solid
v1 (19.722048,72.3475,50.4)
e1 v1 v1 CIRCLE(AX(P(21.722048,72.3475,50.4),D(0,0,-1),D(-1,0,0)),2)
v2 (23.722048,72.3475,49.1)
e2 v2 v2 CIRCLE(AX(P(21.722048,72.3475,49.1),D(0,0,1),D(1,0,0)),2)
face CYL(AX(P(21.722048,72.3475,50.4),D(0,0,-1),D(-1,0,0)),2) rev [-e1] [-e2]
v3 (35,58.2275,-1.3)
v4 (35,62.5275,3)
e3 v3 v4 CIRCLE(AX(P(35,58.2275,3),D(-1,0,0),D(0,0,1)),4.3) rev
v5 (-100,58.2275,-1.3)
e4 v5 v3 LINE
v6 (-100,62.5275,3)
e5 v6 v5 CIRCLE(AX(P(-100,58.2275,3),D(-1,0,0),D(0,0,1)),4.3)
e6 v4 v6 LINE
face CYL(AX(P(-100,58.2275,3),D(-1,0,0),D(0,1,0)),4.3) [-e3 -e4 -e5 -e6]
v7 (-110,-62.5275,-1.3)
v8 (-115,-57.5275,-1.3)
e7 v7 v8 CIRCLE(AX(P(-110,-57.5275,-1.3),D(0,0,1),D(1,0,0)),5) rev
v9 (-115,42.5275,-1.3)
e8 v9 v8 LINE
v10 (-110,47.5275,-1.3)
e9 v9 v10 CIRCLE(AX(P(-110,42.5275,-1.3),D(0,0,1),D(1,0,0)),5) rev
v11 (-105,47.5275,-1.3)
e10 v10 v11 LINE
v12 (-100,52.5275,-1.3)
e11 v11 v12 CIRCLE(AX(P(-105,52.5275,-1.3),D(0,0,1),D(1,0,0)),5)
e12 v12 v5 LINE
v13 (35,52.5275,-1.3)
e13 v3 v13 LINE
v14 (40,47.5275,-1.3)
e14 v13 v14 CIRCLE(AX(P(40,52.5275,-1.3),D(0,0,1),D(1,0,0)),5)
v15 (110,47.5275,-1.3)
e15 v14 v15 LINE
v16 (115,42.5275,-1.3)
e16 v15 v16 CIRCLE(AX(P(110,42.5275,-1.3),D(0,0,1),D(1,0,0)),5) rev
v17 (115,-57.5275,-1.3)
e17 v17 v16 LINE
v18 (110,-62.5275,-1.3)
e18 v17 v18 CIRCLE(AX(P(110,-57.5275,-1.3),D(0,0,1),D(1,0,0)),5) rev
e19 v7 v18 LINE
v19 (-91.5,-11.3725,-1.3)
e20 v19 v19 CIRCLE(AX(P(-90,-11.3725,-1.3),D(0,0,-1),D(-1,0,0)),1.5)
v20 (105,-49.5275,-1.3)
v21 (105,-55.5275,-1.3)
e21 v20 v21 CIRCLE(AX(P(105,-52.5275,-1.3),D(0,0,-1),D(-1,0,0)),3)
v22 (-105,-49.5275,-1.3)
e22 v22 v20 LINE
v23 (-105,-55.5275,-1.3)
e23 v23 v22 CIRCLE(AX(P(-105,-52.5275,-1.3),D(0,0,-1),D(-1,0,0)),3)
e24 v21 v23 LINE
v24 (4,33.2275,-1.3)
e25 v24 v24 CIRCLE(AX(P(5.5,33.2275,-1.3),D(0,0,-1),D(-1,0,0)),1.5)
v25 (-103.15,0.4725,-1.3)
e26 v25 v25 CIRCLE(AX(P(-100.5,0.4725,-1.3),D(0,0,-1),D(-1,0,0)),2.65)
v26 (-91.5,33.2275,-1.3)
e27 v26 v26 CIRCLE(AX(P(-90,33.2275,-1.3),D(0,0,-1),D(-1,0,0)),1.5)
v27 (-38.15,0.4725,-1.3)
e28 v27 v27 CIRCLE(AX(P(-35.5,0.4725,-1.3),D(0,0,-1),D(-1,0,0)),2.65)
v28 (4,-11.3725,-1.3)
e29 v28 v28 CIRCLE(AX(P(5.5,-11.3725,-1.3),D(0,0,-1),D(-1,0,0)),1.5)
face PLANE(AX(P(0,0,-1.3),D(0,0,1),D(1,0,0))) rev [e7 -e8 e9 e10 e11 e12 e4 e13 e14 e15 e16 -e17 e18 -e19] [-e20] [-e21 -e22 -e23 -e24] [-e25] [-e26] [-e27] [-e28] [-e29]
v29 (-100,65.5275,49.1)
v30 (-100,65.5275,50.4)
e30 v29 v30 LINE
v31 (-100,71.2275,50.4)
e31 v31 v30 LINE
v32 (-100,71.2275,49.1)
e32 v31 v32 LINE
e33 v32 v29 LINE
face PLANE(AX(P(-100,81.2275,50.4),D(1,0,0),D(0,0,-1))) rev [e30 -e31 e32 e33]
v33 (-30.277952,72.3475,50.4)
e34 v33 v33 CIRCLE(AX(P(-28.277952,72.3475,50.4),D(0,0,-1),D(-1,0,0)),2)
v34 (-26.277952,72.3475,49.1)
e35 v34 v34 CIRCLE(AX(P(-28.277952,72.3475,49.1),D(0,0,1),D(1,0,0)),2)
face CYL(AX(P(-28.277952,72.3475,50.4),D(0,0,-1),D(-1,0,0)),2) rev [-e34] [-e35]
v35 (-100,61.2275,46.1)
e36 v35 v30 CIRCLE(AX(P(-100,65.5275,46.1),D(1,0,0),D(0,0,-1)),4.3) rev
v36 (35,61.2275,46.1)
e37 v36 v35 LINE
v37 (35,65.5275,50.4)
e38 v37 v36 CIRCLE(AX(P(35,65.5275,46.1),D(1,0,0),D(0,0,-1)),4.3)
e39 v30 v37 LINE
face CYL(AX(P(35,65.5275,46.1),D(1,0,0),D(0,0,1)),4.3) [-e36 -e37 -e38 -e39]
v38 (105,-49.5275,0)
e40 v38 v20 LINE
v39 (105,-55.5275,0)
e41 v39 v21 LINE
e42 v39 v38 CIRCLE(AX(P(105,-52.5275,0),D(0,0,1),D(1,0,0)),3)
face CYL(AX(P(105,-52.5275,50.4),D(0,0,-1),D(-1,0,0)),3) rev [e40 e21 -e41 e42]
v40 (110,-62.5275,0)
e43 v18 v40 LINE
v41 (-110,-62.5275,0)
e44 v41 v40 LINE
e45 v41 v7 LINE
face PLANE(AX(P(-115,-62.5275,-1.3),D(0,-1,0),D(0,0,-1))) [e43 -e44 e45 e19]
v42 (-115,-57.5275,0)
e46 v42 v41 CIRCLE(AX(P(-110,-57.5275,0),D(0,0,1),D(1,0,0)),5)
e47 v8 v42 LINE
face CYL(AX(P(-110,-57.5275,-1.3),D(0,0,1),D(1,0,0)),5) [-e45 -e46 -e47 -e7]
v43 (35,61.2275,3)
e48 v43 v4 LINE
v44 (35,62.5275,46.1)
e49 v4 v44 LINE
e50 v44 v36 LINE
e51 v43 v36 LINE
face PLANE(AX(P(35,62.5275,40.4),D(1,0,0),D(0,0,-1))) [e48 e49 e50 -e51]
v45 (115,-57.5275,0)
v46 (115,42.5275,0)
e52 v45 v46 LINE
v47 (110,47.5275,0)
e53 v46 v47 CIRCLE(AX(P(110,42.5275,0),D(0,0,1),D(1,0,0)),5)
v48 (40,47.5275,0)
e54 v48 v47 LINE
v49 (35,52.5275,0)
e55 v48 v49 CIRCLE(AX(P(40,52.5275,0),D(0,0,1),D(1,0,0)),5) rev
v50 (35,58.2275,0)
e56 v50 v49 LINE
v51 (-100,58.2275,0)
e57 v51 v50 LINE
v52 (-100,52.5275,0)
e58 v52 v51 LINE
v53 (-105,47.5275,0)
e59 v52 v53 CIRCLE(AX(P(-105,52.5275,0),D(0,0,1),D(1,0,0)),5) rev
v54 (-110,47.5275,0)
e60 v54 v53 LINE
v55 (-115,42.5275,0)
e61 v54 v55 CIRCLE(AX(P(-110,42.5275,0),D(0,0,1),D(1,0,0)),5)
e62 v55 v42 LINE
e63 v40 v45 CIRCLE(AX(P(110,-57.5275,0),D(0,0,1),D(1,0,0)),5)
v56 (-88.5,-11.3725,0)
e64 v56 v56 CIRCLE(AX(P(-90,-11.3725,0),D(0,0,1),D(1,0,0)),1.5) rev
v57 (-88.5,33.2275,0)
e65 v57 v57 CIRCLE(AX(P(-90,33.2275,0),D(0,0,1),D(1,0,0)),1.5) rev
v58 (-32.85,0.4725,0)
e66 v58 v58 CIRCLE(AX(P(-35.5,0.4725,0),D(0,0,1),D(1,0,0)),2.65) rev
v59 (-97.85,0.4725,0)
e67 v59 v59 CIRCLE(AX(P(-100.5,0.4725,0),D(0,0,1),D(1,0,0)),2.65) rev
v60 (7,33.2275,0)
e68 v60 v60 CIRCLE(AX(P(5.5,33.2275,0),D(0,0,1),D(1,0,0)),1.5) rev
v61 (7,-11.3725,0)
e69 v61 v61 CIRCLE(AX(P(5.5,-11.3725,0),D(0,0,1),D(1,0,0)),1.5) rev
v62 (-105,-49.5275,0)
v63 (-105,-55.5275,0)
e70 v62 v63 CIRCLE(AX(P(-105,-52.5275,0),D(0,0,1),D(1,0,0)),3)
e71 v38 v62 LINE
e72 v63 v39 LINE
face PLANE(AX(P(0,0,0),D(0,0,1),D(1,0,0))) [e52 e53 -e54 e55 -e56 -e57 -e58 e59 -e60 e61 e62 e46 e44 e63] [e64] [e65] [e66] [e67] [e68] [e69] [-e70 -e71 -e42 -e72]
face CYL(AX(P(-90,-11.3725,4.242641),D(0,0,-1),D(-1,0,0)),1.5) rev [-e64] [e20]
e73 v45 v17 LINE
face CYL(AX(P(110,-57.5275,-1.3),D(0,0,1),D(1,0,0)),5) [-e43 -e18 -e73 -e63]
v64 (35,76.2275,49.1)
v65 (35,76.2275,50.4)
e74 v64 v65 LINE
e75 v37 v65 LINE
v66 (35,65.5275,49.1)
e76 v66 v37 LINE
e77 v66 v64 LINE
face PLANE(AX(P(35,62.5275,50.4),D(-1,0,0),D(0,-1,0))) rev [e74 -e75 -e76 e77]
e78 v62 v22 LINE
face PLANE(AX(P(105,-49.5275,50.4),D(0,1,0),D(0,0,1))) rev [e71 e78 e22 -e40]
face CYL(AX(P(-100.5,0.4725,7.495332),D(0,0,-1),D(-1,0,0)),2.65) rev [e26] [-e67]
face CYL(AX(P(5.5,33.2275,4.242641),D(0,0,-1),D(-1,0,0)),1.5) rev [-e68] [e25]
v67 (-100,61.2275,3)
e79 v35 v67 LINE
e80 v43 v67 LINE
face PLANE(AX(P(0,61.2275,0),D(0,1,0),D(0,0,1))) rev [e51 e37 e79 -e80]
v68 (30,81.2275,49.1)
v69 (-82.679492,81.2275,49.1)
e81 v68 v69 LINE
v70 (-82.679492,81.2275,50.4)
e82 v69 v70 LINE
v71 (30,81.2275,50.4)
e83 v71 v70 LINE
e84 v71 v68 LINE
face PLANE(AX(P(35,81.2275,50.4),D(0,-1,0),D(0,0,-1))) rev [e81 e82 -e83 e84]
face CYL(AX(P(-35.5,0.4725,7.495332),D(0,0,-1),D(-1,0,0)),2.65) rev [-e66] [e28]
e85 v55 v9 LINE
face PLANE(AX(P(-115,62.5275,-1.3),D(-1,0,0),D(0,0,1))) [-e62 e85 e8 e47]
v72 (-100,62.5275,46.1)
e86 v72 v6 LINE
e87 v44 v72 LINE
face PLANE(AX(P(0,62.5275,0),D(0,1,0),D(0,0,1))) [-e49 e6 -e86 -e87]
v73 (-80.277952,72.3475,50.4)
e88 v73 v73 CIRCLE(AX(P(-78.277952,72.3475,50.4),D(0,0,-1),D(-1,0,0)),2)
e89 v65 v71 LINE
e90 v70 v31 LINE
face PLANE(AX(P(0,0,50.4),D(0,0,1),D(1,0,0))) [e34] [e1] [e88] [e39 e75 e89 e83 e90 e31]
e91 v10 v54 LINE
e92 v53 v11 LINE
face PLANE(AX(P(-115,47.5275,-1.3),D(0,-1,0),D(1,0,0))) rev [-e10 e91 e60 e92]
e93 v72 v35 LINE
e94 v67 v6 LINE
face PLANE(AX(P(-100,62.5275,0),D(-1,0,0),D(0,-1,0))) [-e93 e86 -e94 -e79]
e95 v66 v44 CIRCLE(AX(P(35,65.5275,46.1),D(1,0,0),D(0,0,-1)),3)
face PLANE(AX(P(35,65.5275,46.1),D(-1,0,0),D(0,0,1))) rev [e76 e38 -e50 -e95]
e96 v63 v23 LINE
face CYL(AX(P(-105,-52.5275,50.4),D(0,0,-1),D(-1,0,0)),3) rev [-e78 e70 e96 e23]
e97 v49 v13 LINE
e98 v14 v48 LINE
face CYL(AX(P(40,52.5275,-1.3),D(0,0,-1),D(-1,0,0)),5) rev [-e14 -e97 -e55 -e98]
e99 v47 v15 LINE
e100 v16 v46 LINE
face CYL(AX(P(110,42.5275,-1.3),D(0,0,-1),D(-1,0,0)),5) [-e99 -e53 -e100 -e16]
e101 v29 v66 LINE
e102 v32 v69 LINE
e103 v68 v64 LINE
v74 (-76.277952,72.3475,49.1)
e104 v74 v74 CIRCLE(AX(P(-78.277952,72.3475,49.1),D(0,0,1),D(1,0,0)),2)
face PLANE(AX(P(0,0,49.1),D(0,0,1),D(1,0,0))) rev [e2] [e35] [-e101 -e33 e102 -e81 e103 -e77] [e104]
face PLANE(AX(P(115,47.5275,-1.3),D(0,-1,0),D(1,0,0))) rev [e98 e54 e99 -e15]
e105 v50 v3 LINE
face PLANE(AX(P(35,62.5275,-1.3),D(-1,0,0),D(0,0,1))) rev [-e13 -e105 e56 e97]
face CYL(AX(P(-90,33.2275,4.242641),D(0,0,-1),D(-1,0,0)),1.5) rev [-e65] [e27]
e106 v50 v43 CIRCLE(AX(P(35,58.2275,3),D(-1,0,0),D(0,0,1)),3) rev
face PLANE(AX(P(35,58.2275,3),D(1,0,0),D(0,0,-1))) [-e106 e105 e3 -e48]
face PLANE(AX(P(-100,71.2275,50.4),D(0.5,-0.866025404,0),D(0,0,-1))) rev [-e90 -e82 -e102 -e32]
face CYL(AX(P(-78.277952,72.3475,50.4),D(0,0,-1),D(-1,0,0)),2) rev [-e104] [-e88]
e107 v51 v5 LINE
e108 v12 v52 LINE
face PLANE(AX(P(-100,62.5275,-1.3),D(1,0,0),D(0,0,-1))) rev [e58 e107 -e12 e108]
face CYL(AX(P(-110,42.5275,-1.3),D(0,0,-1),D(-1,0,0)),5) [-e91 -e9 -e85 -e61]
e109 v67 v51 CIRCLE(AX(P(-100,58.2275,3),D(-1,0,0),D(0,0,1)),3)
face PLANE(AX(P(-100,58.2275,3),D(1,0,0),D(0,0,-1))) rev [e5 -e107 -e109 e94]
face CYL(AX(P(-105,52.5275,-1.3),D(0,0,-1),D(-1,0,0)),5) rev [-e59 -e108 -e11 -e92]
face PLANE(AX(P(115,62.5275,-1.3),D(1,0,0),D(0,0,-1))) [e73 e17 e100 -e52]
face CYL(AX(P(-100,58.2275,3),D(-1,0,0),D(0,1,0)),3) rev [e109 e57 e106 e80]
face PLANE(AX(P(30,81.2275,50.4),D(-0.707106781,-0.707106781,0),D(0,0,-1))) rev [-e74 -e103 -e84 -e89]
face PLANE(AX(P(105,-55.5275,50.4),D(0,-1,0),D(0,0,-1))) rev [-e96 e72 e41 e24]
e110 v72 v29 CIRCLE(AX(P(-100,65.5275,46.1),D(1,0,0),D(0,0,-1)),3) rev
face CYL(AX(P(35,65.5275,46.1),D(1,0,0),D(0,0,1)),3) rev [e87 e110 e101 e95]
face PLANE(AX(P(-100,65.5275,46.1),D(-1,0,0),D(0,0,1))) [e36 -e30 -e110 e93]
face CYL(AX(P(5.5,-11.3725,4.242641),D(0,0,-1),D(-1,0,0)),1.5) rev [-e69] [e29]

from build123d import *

# Parameters (mm, degrees)
SKETCH1_W                    = 230
SKETCH1_H                    = 125.055
BASE_FLANGE1_DEPTH           = 1.3
SKETCH12_W                   = 80
SKETCH12_H                   = 15
SKETCH12_W_2                 = 15
CUT_EXTRUDE1_DEPTH           = 131.905990147
EDGE_FLANGE1_STRIP_W         = 11.2
EDGE_FLANGE1_STRIP_H         = 1.3
EDGE_FLANGE1_STRIP_CUT_DEPTH = 135
EDGE_FLANGE1_DEPTH           = 135
EDGE_FLANGE2_DEPTH           = 135
CHAMFER1_SIZE                = 10
CHAMFER1_SIZE2               = 17.320508076
CHAMFER3_SIZE                = 5
FILLET1_R                    = 5
CUT_EXTRUDE3_DEPTH           = 150.542859262
CUT_EXTRUDE3_DEPTH_BACK      = 150.542859262
SKETCH14_R                   = 2
SKETCH15_R                   = 2.65
CUT_EXTRUDE4_DEPTH           = 1.3
SKETCH16_R                   = 1.5
CUT_EXTRUDE5_DEPTH           = 1.3


# Sheet-metal steps are written as plain solids
with BuildPart() as part:
    # Sketch1 → Base-Flange1 (new body)
    with BuildSketch(Plane.XY):
        Rectangle(SKETCH1_W, SKETCH1_H)
    extrude(amount=-BASE_FLANGE1_DEPTH)

    # Sketch12 → Cut-Extrude1 (cut, through all)
    with BuildSketch(Plane.XY):
        with Locations((75, 55.0275)):
            Rectangle(SKETCH12_W, SKETCH12_H)
        with Locations((-107.5, 55.0275)):
            Rectangle(SKETCH12_W_2, SKETCH12_H)
    extrude(amount=-CUT_EXTRUDE1_DEPTH, mode=Mode.SUBTRACT)

    # Edge-Flange1 strip (across the edge) → Edge-Flange1 strip cut (cut)
    with BuildSketch(Plane(origin=(35, 62.5275, 0), x_dir=(0, -1, 0), z_dir=(-1, 0, 0))):
        with Locations((-1.3, -0.65)):
            Rectangle(EDGE_FLANGE1_STRIP_W, EDGE_FLANGE1_STRIP_H)
    extrude(amount=EDGE_FLANGE1_STRIP_CUT_DEPTH, mode=Mode.SUBTRACT)

    # Edge-Flange1 section (across the edge) → Edge-Flange1 (add)
    with BuildSketch(Plane(origin=(35, 62.5275, 0), x_dir=(0, -1, 0), z_dir=(-1, 0, 0))):
        with BuildLine():
            Line((0, 3), (0, 40.4))
            Line((0, 40.4), (1.3, 40.4))
            Line((1.3, 40.4), (1.3, 3))
            ThreePointArc((1.3, 3), (2.178679656, 0.878679656), (4.3, 0))
            Line((4.3, 0), (4.3, -1.3))
            ThreePointArc((4.3, -1.3), (1.259440841, -0.040559159), (0, 3))
        make_face()
    extrude(amount=EDGE_FLANGE1_DEPTH)

    # Edge-Flange2 section (across the edge) → Edge-Flange2 (add)
    with BuildSketch(Plane(origin=(-100, 62.5275, 50.4), x_dir=(0, 0, -1), z_dir=(1, 0, 0))):
        with BuildLine():
            Line((0, 3), (0, 18.7))
            Line((0, 18.7), (1.3, 18.7))
            Line((1.3, 18.7), (1.3, 3))
            ThreePointArc((1.3, 3), (2.178679656, 0.878679656), (4.3, 0))
            Line((4.3, 0), (10, 0))
            Line((10, 0), (10, -1.3))
            Line((10, -1.3), (4.3, -1.3))
            ThreePointArc((4.3, -1.3), (1.259440841, -0.040559159), (0, 3))
        make_face()
    extrude(amount=EDGE_FLANGE2_DEPTH)

    # Chamfer1
    chamfer1_edges = [part.edges().sort_by_distance(p)[0] for p in [
        (-100, 81.2275, 49.75),
    ]]
    chamfer1_side = [part.faces().sort_by_distance(p)[0] for p in [
        (-100, 52.8775, -0.617136938),
    ]]
    chamfer(chamfer1_edges, length=CHAMFER1_SIZE, length2=CHAMFER1_SIZE2, reference=chamfer1_side[0])

    # Chamfer3
    chamfer3_edges = [part.edges().sort_by_distance(p)[0] for p in [
        (35, 81.2275, 49.75),
    ]]
    chamfer(chamfer3_edges, length=CHAMFER3_SIZE)

    # Fillet1
    fillet1_edges = [part.edges().sort_by_distance(p)[0] for p in [
        (115, 47.5275, -0.65),
        (35, 47.5275, -0.65),
        (-115, 47.5275, -0.65),
        (-100, 47.5275, -0.65),
        (115, -62.5275, -0.65),
        (-115, -62.5275, -0.65),
    ]]
    fillet(fillet1_edges, radius=FILLET1_R)

    # Sketch14 → Cut-Extrude3 (cut, two sides: drawn at the far end of the back side and taken through both)
    with BuildSketch(Plane(origin=(0, 0, 49.1), x_dir=(-1, 0, 0), z_dir=(0, 0, -1)).offset(-CUT_EXTRUDE3_DEPTH_BACK)):
        with Locations((-21.722047565, 72.3475)):
            Circle(SKETCH14_R)
        with Locations((28.277952435, 72.3475)):
            Circle(SKETCH14_R)
        with Locations((78.277952435, 72.3475)):
            Circle(SKETCH14_R)
        with BuildLine():
            Line((-105, -49.5275), (105, -49.5275))
            ThreePointArc((105, -49.5275), (108, -52.5275), (105, -55.5275))
            Line((105, -55.5275), (-105, -55.5275))
            ThreePointArc((-105, -55.5275), (-108, -52.5275), (-105, -49.5275))
        make_face()
    extrude(amount=CUT_EXTRUDE3_DEPTH + CUT_EXTRUDE3_DEPTH_BACK, mode=Mode.SUBTRACT)

    # Sketch15 → Cut-Extrude4 (cut)
    with BuildSketch(Plane(origin=(0, 0, -1.3), x_dir=(-1, 0, 0), z_dir=(0, 0, -1))):
        with Locations((35.5, 0.4725)):
            Circle(SKETCH15_R)
        with Locations((100.5, 0.4725)):
            Circle(SKETCH15_R)
    extrude(amount=-CUT_EXTRUDE4_DEPTH, mode=Mode.SUBTRACT)

    # Sketch16 → Cut-Extrude5 (cut)
    with BuildSketch(Plane(origin=(0, 0, -1.3), x_dir=(-1, 0, 0), z_dir=(0, 0, -1))):
        with Locations((90, 33.2275)):
            Circle(SKETCH16_R)
        with Locations((-5.5, 33.2275)):
            Circle(SKETCH16_R)
        with Locations((-5.5, -11.3725)):
            Circle(SKETCH16_R)
        with Locations((90, -11.3725)):
            Circle(SKETCH16_R)
    extrude(amount=-CUT_EXTRUDE5_DEPTH, mode=Mode.SUBTRACT)


solid = part.part
